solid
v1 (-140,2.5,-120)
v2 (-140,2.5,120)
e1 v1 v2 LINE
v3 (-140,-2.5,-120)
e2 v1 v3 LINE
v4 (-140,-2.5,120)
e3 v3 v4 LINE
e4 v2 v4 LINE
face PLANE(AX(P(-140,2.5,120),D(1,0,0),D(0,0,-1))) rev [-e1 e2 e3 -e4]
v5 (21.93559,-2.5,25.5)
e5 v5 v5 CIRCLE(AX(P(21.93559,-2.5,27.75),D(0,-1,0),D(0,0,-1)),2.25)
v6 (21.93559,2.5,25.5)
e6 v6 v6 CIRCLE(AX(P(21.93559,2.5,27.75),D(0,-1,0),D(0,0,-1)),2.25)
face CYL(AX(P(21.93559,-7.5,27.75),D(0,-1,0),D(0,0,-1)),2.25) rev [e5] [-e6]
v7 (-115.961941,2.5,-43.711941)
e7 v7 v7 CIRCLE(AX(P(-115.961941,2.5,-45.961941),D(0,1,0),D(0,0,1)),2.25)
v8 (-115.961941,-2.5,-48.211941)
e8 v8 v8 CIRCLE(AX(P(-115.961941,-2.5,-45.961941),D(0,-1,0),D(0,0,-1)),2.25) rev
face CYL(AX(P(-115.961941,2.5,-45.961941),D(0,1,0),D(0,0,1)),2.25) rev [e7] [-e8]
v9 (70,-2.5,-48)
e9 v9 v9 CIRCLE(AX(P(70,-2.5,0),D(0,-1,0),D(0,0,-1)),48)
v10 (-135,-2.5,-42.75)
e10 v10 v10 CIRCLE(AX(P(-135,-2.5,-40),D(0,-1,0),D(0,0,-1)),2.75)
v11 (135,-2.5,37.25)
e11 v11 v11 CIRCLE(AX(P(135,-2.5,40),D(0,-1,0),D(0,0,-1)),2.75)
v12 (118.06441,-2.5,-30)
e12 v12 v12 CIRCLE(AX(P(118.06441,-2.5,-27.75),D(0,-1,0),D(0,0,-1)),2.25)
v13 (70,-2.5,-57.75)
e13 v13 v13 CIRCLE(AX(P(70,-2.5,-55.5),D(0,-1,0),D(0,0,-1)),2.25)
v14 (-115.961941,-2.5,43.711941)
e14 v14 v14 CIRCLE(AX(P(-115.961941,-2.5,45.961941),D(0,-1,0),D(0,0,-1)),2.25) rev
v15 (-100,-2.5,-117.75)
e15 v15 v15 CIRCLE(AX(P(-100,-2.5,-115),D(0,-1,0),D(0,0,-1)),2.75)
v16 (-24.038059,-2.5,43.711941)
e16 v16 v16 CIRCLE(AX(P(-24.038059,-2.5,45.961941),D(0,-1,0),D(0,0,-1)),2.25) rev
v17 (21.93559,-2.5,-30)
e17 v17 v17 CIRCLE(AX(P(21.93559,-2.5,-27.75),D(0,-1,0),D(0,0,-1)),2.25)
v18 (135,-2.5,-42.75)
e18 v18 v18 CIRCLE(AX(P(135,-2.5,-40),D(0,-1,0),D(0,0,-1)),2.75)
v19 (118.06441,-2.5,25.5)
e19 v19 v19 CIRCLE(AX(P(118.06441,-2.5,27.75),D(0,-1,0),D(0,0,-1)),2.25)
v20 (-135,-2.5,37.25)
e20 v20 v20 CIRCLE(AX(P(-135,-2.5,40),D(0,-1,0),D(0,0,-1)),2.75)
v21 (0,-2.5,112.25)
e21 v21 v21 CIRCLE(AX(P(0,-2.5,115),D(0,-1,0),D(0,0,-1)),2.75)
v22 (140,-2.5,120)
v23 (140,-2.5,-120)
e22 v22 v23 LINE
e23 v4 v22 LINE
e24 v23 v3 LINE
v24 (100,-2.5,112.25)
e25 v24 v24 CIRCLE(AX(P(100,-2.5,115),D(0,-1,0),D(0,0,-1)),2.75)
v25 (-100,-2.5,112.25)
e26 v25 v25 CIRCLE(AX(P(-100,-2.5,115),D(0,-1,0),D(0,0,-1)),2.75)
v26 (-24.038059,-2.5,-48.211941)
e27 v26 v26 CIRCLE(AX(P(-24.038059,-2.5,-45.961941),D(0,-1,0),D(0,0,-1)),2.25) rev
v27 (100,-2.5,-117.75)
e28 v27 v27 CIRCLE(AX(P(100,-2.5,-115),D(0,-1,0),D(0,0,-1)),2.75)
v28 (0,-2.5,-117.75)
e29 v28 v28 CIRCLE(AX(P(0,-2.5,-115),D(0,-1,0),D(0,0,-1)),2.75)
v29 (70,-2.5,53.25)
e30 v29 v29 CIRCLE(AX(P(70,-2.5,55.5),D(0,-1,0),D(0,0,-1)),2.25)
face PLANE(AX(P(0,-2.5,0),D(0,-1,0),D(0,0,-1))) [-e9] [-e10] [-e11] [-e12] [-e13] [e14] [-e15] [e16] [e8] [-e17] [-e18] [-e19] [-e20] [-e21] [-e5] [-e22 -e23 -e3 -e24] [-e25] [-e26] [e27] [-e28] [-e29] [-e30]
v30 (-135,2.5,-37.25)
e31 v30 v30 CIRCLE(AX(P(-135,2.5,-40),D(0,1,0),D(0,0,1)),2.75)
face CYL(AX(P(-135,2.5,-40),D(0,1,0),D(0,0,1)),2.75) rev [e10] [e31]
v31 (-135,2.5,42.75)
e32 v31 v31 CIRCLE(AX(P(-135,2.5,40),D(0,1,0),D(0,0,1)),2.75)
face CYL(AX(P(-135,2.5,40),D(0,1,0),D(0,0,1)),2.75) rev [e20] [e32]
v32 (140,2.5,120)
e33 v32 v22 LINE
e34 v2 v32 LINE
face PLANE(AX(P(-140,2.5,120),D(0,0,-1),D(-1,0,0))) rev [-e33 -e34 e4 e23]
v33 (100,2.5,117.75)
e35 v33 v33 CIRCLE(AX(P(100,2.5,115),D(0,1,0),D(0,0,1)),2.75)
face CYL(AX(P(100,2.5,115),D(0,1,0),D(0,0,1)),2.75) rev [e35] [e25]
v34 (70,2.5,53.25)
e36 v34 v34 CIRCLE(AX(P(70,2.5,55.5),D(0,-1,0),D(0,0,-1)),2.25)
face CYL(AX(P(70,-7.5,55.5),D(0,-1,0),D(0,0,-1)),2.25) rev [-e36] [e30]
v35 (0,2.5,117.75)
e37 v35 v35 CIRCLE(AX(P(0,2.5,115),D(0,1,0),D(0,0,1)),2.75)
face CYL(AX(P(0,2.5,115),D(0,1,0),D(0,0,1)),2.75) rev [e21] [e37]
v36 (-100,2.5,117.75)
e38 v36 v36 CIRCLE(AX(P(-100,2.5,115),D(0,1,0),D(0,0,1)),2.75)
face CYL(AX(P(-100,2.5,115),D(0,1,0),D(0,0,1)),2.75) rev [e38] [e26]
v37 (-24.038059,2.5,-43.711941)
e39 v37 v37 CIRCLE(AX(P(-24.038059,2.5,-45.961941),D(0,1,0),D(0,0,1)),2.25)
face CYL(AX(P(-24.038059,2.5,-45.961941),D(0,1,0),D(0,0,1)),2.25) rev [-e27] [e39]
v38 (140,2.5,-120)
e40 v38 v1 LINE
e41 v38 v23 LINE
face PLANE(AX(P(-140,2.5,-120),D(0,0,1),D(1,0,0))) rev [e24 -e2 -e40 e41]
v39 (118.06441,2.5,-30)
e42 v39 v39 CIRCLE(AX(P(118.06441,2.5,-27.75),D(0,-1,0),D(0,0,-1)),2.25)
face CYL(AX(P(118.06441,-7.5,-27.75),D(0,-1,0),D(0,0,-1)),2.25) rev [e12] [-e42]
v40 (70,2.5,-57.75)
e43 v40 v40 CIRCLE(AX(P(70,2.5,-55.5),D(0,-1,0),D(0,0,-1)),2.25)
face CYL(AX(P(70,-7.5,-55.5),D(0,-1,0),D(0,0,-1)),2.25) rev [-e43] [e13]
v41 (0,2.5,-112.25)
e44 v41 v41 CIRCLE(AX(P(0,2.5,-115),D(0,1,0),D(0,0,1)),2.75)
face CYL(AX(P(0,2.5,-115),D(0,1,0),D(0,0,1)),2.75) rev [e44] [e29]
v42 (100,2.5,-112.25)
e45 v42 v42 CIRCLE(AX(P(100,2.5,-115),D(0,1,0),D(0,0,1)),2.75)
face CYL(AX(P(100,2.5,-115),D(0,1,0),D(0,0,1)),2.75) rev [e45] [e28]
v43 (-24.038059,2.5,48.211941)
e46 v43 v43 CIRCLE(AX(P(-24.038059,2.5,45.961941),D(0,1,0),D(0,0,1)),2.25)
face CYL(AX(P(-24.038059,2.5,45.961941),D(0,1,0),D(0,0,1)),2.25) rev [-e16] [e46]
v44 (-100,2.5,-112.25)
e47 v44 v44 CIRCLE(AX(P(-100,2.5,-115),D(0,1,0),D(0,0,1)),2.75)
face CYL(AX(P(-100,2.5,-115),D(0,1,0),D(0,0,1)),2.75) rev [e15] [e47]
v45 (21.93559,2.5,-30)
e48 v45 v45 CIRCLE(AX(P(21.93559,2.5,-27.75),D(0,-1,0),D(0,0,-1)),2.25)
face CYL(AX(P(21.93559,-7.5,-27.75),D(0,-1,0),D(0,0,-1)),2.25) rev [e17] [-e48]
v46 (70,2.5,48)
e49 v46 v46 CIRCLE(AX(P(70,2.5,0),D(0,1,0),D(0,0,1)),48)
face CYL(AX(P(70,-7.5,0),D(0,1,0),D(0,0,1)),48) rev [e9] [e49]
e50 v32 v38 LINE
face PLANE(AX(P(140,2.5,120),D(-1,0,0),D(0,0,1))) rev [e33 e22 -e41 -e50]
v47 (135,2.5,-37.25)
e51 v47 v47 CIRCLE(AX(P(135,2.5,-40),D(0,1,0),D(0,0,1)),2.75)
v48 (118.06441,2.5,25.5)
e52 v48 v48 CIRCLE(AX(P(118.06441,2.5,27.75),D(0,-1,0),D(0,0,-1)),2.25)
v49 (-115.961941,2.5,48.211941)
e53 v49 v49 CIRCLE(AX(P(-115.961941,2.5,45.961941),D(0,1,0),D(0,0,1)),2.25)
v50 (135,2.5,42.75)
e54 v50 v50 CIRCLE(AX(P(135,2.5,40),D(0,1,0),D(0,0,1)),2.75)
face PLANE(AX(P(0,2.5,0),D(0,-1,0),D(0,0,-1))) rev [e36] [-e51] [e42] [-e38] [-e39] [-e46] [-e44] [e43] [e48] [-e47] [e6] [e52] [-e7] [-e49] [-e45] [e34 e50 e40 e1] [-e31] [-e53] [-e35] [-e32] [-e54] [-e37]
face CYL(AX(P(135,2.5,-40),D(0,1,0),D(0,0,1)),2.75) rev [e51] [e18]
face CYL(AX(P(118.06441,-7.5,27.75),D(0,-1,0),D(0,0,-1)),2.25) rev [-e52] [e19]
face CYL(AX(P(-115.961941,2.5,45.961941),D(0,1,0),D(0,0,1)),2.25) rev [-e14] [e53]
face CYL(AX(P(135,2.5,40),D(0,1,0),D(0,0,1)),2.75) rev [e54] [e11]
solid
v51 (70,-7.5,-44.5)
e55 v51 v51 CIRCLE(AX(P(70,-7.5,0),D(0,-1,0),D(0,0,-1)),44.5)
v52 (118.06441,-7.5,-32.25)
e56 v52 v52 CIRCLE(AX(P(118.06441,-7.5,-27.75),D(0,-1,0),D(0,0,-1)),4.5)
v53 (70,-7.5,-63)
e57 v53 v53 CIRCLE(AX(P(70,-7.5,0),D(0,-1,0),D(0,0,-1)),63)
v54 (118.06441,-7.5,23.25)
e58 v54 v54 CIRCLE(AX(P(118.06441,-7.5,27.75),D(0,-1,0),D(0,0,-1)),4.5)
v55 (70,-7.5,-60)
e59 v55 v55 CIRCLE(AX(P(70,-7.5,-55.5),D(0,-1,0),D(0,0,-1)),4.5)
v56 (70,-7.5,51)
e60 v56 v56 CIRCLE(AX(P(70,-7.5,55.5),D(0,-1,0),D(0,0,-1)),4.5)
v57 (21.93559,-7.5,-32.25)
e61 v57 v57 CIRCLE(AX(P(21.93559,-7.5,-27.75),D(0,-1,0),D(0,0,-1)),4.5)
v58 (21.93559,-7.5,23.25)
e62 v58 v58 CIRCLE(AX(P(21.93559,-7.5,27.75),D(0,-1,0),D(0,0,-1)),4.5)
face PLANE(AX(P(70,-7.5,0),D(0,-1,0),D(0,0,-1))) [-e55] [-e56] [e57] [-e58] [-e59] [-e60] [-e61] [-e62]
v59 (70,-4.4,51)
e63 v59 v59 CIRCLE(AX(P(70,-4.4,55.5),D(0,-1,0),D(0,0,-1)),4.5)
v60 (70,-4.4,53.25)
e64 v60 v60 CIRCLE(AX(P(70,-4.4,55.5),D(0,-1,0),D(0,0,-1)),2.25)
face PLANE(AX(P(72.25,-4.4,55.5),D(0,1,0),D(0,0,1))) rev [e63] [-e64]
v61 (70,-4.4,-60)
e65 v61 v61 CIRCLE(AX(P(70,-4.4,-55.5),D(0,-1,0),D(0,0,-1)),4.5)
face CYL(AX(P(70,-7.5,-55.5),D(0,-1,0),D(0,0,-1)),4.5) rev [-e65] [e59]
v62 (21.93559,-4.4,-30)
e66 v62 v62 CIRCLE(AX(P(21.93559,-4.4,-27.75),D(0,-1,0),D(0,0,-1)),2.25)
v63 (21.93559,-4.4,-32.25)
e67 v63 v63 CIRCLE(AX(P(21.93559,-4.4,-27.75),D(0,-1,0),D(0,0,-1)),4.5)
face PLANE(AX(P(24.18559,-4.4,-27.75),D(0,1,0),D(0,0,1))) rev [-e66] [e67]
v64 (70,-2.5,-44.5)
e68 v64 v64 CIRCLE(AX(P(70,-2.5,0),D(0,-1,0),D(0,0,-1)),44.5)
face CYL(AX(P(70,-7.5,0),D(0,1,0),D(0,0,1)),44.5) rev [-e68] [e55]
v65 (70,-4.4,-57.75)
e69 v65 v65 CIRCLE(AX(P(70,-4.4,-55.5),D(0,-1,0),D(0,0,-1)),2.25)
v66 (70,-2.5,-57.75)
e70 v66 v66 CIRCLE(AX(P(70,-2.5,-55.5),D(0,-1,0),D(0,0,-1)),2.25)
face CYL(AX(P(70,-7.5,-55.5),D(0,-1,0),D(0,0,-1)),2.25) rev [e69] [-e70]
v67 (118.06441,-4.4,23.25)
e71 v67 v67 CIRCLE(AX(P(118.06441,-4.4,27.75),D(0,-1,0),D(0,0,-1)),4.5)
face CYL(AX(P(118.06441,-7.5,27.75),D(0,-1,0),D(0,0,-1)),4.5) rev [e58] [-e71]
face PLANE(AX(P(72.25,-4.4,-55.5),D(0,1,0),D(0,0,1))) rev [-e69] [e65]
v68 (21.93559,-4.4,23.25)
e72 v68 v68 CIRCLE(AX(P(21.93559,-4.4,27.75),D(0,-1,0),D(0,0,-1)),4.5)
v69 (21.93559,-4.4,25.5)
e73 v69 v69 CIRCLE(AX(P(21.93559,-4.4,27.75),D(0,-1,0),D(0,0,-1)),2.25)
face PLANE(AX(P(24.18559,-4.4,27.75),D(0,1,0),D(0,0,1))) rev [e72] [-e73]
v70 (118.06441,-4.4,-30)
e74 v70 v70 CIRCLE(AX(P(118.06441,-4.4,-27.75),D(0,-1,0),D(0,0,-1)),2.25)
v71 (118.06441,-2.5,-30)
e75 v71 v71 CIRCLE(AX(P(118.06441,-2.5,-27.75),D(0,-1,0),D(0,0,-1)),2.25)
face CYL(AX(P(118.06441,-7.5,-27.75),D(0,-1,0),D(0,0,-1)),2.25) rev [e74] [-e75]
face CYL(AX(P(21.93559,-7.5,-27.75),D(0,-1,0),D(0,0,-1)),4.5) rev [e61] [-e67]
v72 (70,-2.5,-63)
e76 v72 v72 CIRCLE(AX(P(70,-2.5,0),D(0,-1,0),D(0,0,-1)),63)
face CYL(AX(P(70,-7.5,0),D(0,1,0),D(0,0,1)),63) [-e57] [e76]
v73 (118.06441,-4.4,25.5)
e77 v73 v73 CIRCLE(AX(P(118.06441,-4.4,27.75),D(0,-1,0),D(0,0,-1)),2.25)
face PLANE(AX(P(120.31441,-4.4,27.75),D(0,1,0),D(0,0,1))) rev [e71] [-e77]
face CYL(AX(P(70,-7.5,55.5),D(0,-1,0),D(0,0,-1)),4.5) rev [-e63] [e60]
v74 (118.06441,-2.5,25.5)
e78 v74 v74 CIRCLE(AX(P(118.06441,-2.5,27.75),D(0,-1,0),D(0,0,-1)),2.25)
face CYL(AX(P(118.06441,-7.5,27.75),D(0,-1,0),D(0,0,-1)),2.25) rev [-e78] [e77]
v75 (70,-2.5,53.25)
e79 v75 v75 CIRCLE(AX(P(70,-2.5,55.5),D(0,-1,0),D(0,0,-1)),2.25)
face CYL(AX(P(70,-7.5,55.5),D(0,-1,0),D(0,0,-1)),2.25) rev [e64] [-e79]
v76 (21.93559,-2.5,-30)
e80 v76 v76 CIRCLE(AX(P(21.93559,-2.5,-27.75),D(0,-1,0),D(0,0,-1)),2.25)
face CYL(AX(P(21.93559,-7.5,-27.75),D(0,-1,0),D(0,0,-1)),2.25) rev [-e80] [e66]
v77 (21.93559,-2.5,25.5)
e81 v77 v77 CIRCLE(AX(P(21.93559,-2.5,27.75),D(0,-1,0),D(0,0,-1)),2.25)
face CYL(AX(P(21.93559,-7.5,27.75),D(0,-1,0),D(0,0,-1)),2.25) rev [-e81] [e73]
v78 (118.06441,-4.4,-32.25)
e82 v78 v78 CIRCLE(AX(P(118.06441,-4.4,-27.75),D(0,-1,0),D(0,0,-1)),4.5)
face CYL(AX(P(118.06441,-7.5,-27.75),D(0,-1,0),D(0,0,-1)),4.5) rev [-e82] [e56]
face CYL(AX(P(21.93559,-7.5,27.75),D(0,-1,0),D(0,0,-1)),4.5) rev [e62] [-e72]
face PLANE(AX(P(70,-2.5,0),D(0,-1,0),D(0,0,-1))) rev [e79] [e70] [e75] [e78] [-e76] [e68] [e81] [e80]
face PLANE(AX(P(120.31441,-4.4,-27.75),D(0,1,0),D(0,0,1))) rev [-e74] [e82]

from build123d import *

# Parameters (mm, degrees)
CROQUIS1_W                                  = 280
CROQUIS1_H                                  = 240
SALIENTE_EXTRUIR1_DEPTH                     = 2.5
CROQUIS2_R                                  = 48
CORTAR_EXTRUIR1_DEPTH                       = 10
CROQUIS3_R                                  = 63
CROQUIS3_R_2                                = 44.5
SALIENTE_EXTRUIR2_DEPTH                     = 5
TALADRO_DE_MARGEN_PARA_M51_AT_2_COUNT       = 2
TALADRO_DE_MARGEN_PARA_M51_AT_2_PITCH       = 200
TALADRO_DE_MARGEN_PARA_M51_AT_3_COUNT       = 2
TALADRO_DE_MARGEN_PARA_M51_AT_3_PITCH       = 246.677927671
TALADRO_DE_MARGEN_PARA_M51_AT_4_COUNT       = 2
TALADRO_DE_MARGEN_PARA_M51_AT_4_PITCH       = 281.513765205
TALADRO_DE_MARGEN_PARA_M51_AT_5_COUNT       = 2
TALADRO_DE_MARGEN_PARA_M51_AT_5_PITCH       = 304.795013083
TALADRO_DE_MARGEN_PARA_M51_AT_6_COUNT       = 2
TALADRO_DE_MARGEN_PARA_M51_AT_6_PITCH       = 230
TALADRO_DE_MARGEN_PARA_M51_AT_7_COUNT       = 2
TALADRO_DE_MARGEN_PARA_M51_AT_7_PITCH       = 158.902485821
TALADRO_DE_MARGEN_PARA_M51_AT_8_COUNT       = 2
TALADRO_DE_MARGEN_PARA_M51_AT_8_PITCH       = 82.764726786
TALADRO_DE_MARGEN_PARA_M51_AT_9_COUNT       = 2
TALADRO_DE_MARGEN_PARA_M51_AT_9_PITCH       = 100
TALADRO_DE_MARGEN_PARA_M51_AT_10_COUNT      = 2
TALADRO_DE_MARGEN_PARA_M51_AT_10_PITCH      = 250.79872408
REFRENTADO_PARA_TORNILLO_CON_CABEZA_2_COUNT = 2
REFRENTADO_PARA_TORNILLO_CON_CABEZA_2_PITCH = 55.5
REFRENTADO_PARA_TORNILLO_CON_CABEZA_3_COUNT = 2
REFRENTADO_PARA_TORNILLO_CON_CABEZA_3_PITCH = 96.12881982
REFRENTADO_PARA_TORNILLO_CON_CABEZA_4_COUNT = 2
REFRENTADO_PARA_TORNILLO_CON_CABEZA_4_PITCH = 111
REFRENTADO_PARA_TORNILLO_CON_CABEZA_5_COUNT = 2
REFRENTADO_PARA_TORNILLO_CON_CABEZA_5_PITCH = 96.12881982
REFRENTADO_PARA_TORNILLO_CON_CABEZA_6_COUNT = 2
REFRENTADO_PARA_TORNILLO_CON_CABEZA_6_PITCH = 55.5
TALADRO_START                               = -2.5
TALADRO_DE_MARGEN_PARA_M41_OUTLINE_R        = 2.25
TALADRO_DE_MARGEN_PARA_M41_DEPTH            = 5


# Read off the part's stored shape, not the designer's step: Taladro de margen para M41
with BuildPart() as part:
    # Croquis1 → Saliente-Extruir1 (new, symmetric)
    with BuildSketch(Plane(origin=(0, 0, 0), x_dir=(1, 0, 0), z_dir=(0, 1, 0))):
        Rectangle(CROQUIS1_W, CROQUIS1_H)
    extrude(amount=SALIENTE_EXTRUIR1_DEPTH, both=True)

    # Croquis2 → Cortar-Extruir1 (cut)
    with BuildSketch(Plane(origin=(0, 2.5, 0), x_dir=(1, 0, 0), z_dir=(0, 1, 0))):
        with Locations(Location((70, 0, 0), (0, 0, 270))):
            Circle(CROQUIS2_R)
    extrude(amount=-CORTAR_EXTRUIR1_DEPTH, mode=Mode.SUBTRACT)

    # Croquis8 → Taladro de margen para M51 (revolve, cut)
    with BuildSketch(Plane(origin=(-100, 2.5, -115), x_dir=(0, 0, 1), z_dir=(1, 0, 0))):
        Polygon((0, 0), (0, 11.652366702), (2.75, 10), (2.75, 0), align=None)
    taladro_de_margen_para_m51 = revolve(axis=Axis((-100, 8.85, -115), (0, -1, 0)), mode=Mode.SUBTRACT)

    # Taladro de margen para M51 at 2: Taladro de margen para M51 ×2
    with Locations(*[(i * TALADRO_DE_MARGEN_PARA_M51_AT_2_PITCH, 0, 0) for i in range(1, TALADRO_DE_MARGEN_PARA_M51_AT_2_COUNT)]):
        add(taladro_de_margen_para_m51, mode=Mode.SUBTRACT)

    # Taladro de margen para M51 at 3: Taladro de margen para M51 ×2
    with Locations(*[Vector(0.9526592112186828, 0, 0.30404017379319676) * (i * TALADRO_DE_MARGEN_PARA_M51_AT_3_PITCH) for i in range(1, TALADRO_DE_MARGEN_PARA_M51_AT_3_COUNT)]):
        add(taladro_de_margen_para_m51, mode=Mode.SUBTRACT)

    # Taladro de margen para M51 at 4: Taladro de margen para M51 ×2
    with Locations(*[Vector(0.8347726791573308, 0, 0.5505947458271757) * (i * TALADRO_DE_MARGEN_PARA_M51_AT_4_PITCH) for i in range(1, TALADRO_DE_MARGEN_PARA_M51_AT_4_COUNT)]):
        add(taladro_de_margen_para_m51, mode=Mode.SUBTRACT)

    # Taladro de margen para M51 at 5: Taladro de margen para M51 ×2
    with Locations(*[Vector(0.6561787149247867, 0, 0.7546055221635047) * (i * TALADRO_DE_MARGEN_PARA_M51_AT_5_PITCH) for i in range(1, TALADRO_DE_MARGEN_PARA_M51_AT_5_COUNT)]):
        add(taladro_de_margen_para_m51, mode=Mode.SUBTRACT)

    # Taladro de margen para M51 at 6: Taladro de margen para M51 ×2
    with Locations(*[(0, 0, i * TALADRO_DE_MARGEN_PARA_M51_AT_6_PITCH) for i in range(1, TALADRO_DE_MARGEN_PARA_M51_AT_6_COUNT)]):
        add(taladro_de_margen_para_m51, mode=Mode.SUBTRACT)

    # Taladro de margen para M51 at 7: Taladro de margen para M51 ×2
    with Locations(*[Vector(-0.22026087143464337, 0, 0.9754410020677066) * (i * TALADRO_DE_MARGEN_PARA_M51_AT_7_PITCH) for i in range(1, TALADRO_DE_MARGEN_PARA_M51_AT_7_COUNT)]):
        add(taladro_de_margen_para_m51, mode=Mode.SUBTRACT)

    # Taladro de margen para M51 at 8: Taladro de margen para M51 ×2
    with Locations(*[Vector(-0.42288546533112376, 0, 0.9061831399952656) * (i * TALADRO_DE_MARGEN_PARA_M51_AT_8_PITCH) for i in range(1, TALADRO_DE_MARGEN_PARA_M51_AT_8_COUNT)]):
        add(taladro_de_margen_para_m51, mode=Mode.SUBTRACT)

    # Taladro de margen para M51 at 9: Taladro de margen para M51 ×2
    with Locations(*[(i * TALADRO_DE_MARGEN_PARA_M51_AT_9_PITCH, 0, 0) for i in range(1, TALADRO_DE_MARGEN_PARA_M51_AT_9_COUNT)]):
        add(taladro_de_margen_para_m51, mode=Mode.SUBTRACT)

    # Taladro de margen para M51 at 10: Taladro de margen para M51 ×2
    with Locations(*[Vector(0.39872611141444997, 0, 0.917070056253235) * (i * TALADRO_DE_MARGEN_PARA_M51_AT_10_PITCH) for i in range(1, TALADRO_DE_MARGEN_PARA_M51_AT_10_COUNT)]):
        add(taladro_de_margen_para_m51, mode=Mode.SUBTRACT)


with BuildPart() as body_2:
    # Croquis3 → Saliente-Extruir2 (new body)
    with BuildSketch(Plane.XZ.offset(2.5)):
        with Locations(Location((70, 0, 0), (0, 0, 270))):
            Circle(CROQUIS3_R)
        with Locations(Location((70, 0, 0), (0, 0, 270))):
            Circle(CROQUIS3_R_2, mode=Mode.SUBTRACT)
    extrude(amount=SALIENTE_EXTRUIR2_DEPTH)


with BuildPart() as refrentado_para_tornillo_con_cabeza_tron_tool:
    # Croquis11 → Refrentado para tornillo con cabeza troncocónica de M41 (revolve)
    with BuildSketch(Plane(origin=(70, -7.5, 55.5), x_dir=(0, 0, -1), z_dir=(1, 0, 0))):
        Polygon((0, 0), (0, 21.351936393), (2.25, 20), (2.25, 3.1), (4.5, 3.1), (4.5, 0), align=None)
    refrentado_para_tornillo_con_cabeza_tron = revolve(axis=Axis((70, -13.85, 55.5), (0, 1, 0)))


with BuildPart() as part_1:
    add(part.part)

    # Refrentado para tornillo con cabeza troncocónica de M41: cut by refrentado_para_tornillo_con_cabeza_tron_tool
    add(refrentado_para_tornillo_con_cabeza_tron_tool.part, mode=Mode.SUBTRACT)


with BuildPart() as body_2_1:
    add(body_2.part)

    # Refrentado para tornillo con cabeza troncocónica de M41: cut by refrentado_para_tornillo_con_cabeza_tron_tool
    add(refrentado_para_tornillo_con_cabeza_tron_tool.part, mode=Mode.SUBTRACT)


with BuildPart() as refrentado_para_tornillo_con_cabeza_2_tool:
    # Refrentado para tornillo con cabeza  2: Refrentado para tornillo con cabeza troncocónica de M41 ×2
    with Locations(*[Vector(0.8660254037844387, 0, -0.49999999999999994) * (i * REFRENTADO_PARA_TORNILLO_CON_CABEZA_2_PITCH) for i in range(1, REFRENTADO_PARA_TORNILLO_CON_CABEZA_2_COUNT)]):
        add(refrentado_para_tornillo_con_cabeza_tron)


with BuildPart() as part_2:
    add(part_1.part)

    # Refrentado para tornillo con cabeza  2: cut by refrentado_para_tornillo_con_cabeza_2_tool
    add(refrentado_para_tornillo_con_cabeza_2_tool.part, mode=Mode.SUBTRACT)


with BuildPart() as body_2_2:
    add(body_2_1.part)

    # Refrentado para tornillo con cabeza  2: cut by refrentado_para_tornillo_con_cabeza_2_tool
    add(refrentado_para_tornillo_con_cabeza_2_tool.part, mode=Mode.SUBTRACT)


with BuildPart() as refrentado_para_tornillo_con_cabeza_3_tool:
    # Refrentado para tornillo con cabeza  3: Refrentado para tornillo con cabeza troncocónica de M41 ×2
    with Locations(*[Vector(0.5000000000000001, 0, -0.8660254037844387) * (i * REFRENTADO_PARA_TORNILLO_CON_CABEZA_3_PITCH) for i in range(1, REFRENTADO_PARA_TORNILLO_CON_CABEZA_3_COUNT)]):
        add(refrentado_para_tornillo_con_cabeza_tron)


with BuildPart() as part_3:
    add(part_2.part)

    # Refrentado para tornillo con cabeza  3: cut by refrentado_para_tornillo_con_cabeza_3_tool
    add(refrentado_para_tornillo_con_cabeza_3_tool.part, mode=Mode.SUBTRACT)


with BuildPart() as body_2_3:
    add(body_2_2.part)

    # Refrentado para tornillo con cabeza  3: cut by refrentado_para_tornillo_con_cabeza_3_tool
    add(refrentado_para_tornillo_con_cabeza_3_tool.part, mode=Mode.SUBTRACT)


with BuildPart() as refrentado_para_tornillo_con_cabeza_4_tool:
    # Refrentado para tornillo con cabeza  4: Refrentado para tornillo con cabeza troncocónica de M41 ×2
    with Locations(*[(0, 0, -i * REFRENTADO_PARA_TORNILLO_CON_CABEZA_4_PITCH) for i in range(1, REFRENTADO_PARA_TORNILLO_CON_CABEZA_4_COUNT)]):
        add(refrentado_para_tornillo_con_cabeza_tron)


with BuildPart() as part_4:
    add(part_3.part)

    # Refrentado para tornillo con cabeza  4: cut by refrentado_para_tornillo_con_cabeza_4_tool
    add(refrentado_para_tornillo_con_cabeza_4_tool.part, mode=Mode.SUBTRACT)


with BuildPart() as body_2_4:
    add(body_2_3.part)

    # Refrentado para tornillo con cabeza  4: cut by refrentado_para_tornillo_con_cabeza_4_tool
    add(refrentado_para_tornillo_con_cabeza_4_tool.part, mode=Mode.SUBTRACT)


with BuildPart() as refrentado_para_tornillo_con_cabeza_5_tool:
    # Refrentado para tornillo con cabeza  5: Refrentado para tornillo con cabeza troncocónica de M41 ×2
    with Locations(*[Vector(-0.4999999999999997, 0, -0.8660254037844388) * (i * REFRENTADO_PARA_TORNILLO_CON_CABEZA_5_PITCH) for i in range(1, REFRENTADO_PARA_TORNILLO_CON_CABEZA_5_COUNT)]):
        add(refrentado_para_tornillo_con_cabeza_tron)


with BuildPart() as part_5:
    add(part_4.part)

    # Refrentado para tornillo con cabeza  5: cut by refrentado_para_tornillo_con_cabeza_5_tool
    add(refrentado_para_tornillo_con_cabeza_5_tool.part, mode=Mode.SUBTRACT)


with BuildPart() as body_2_5:
    add(body_2_4.part)

    # Refrentado para tornillo con cabeza  5: cut by refrentado_para_tornillo_con_cabeza_5_tool
    add(refrentado_para_tornillo_con_cabeza_5_tool.part, mode=Mode.SUBTRACT)


with BuildPart() as refrentado_para_tornillo_con_cabeza_6_tool:
    # Refrentado para tornillo con cabeza  6: Refrentado para tornillo con cabeza troncocónica de M41 ×2
    with Locations(*[Vector(-0.8660254037844388, 0, -0.4999999999999997) * (i * REFRENTADO_PARA_TORNILLO_CON_CABEZA_6_PITCH) for i in range(1, REFRENTADO_PARA_TORNILLO_CON_CABEZA_6_COUNT)]):
        add(refrentado_para_tornillo_con_cabeza_tron)


with BuildPart() as part_6:
    add(part_5.part)

    # Refrentado para tornillo con cabeza  6: cut by refrentado_para_tornillo_con_cabeza_6_tool
    add(refrentado_para_tornillo_con_cabeza_6_tool.part, mode=Mode.SUBTRACT)

    # Taladro de margen para M41 outline → Taladro de margen para M41 (cut)
    with BuildSketch(Plane(origin=(0, 0, 0), x_dir=(1, 0, 0), z_dir=(0, 1, 0)).offset(TALADRO_START)):
        with Locations((-24.038059223, -45.961940777)):
            Circle(TALADRO_DE_MARGEN_PARA_M41_OUTLINE_R)
        with Locations((-115.961940777, 45.961940777)):
            Circle(TALADRO_DE_MARGEN_PARA_M41_OUTLINE_R)
        with Locations((-115.961940777, -45.961940777)):
            Circle(TALADRO_DE_MARGEN_PARA_M41_OUTLINE_R)
        with Locations((-24.038059223, 45.961940777)):
            Circle(TALADRO_DE_MARGEN_PARA_M41_OUTLINE_R)
    extrude(amount=TALADRO_DE_MARGEN_PARA_M41_DEPTH, mode=Mode.SUBTRACT)


with BuildPart() as body_2_6:
    add(body_2_5.part)

    # Refrentado para tornillo con cabeza  6: cut by refrentado_para_tornillo_con_cabeza_6_tool
    add(refrentado_para_tornillo_con_cabeza_6_tool.part, mode=Mode.SUBTRACT)


solid = Compound([part_6.part, body_2_6.part])
